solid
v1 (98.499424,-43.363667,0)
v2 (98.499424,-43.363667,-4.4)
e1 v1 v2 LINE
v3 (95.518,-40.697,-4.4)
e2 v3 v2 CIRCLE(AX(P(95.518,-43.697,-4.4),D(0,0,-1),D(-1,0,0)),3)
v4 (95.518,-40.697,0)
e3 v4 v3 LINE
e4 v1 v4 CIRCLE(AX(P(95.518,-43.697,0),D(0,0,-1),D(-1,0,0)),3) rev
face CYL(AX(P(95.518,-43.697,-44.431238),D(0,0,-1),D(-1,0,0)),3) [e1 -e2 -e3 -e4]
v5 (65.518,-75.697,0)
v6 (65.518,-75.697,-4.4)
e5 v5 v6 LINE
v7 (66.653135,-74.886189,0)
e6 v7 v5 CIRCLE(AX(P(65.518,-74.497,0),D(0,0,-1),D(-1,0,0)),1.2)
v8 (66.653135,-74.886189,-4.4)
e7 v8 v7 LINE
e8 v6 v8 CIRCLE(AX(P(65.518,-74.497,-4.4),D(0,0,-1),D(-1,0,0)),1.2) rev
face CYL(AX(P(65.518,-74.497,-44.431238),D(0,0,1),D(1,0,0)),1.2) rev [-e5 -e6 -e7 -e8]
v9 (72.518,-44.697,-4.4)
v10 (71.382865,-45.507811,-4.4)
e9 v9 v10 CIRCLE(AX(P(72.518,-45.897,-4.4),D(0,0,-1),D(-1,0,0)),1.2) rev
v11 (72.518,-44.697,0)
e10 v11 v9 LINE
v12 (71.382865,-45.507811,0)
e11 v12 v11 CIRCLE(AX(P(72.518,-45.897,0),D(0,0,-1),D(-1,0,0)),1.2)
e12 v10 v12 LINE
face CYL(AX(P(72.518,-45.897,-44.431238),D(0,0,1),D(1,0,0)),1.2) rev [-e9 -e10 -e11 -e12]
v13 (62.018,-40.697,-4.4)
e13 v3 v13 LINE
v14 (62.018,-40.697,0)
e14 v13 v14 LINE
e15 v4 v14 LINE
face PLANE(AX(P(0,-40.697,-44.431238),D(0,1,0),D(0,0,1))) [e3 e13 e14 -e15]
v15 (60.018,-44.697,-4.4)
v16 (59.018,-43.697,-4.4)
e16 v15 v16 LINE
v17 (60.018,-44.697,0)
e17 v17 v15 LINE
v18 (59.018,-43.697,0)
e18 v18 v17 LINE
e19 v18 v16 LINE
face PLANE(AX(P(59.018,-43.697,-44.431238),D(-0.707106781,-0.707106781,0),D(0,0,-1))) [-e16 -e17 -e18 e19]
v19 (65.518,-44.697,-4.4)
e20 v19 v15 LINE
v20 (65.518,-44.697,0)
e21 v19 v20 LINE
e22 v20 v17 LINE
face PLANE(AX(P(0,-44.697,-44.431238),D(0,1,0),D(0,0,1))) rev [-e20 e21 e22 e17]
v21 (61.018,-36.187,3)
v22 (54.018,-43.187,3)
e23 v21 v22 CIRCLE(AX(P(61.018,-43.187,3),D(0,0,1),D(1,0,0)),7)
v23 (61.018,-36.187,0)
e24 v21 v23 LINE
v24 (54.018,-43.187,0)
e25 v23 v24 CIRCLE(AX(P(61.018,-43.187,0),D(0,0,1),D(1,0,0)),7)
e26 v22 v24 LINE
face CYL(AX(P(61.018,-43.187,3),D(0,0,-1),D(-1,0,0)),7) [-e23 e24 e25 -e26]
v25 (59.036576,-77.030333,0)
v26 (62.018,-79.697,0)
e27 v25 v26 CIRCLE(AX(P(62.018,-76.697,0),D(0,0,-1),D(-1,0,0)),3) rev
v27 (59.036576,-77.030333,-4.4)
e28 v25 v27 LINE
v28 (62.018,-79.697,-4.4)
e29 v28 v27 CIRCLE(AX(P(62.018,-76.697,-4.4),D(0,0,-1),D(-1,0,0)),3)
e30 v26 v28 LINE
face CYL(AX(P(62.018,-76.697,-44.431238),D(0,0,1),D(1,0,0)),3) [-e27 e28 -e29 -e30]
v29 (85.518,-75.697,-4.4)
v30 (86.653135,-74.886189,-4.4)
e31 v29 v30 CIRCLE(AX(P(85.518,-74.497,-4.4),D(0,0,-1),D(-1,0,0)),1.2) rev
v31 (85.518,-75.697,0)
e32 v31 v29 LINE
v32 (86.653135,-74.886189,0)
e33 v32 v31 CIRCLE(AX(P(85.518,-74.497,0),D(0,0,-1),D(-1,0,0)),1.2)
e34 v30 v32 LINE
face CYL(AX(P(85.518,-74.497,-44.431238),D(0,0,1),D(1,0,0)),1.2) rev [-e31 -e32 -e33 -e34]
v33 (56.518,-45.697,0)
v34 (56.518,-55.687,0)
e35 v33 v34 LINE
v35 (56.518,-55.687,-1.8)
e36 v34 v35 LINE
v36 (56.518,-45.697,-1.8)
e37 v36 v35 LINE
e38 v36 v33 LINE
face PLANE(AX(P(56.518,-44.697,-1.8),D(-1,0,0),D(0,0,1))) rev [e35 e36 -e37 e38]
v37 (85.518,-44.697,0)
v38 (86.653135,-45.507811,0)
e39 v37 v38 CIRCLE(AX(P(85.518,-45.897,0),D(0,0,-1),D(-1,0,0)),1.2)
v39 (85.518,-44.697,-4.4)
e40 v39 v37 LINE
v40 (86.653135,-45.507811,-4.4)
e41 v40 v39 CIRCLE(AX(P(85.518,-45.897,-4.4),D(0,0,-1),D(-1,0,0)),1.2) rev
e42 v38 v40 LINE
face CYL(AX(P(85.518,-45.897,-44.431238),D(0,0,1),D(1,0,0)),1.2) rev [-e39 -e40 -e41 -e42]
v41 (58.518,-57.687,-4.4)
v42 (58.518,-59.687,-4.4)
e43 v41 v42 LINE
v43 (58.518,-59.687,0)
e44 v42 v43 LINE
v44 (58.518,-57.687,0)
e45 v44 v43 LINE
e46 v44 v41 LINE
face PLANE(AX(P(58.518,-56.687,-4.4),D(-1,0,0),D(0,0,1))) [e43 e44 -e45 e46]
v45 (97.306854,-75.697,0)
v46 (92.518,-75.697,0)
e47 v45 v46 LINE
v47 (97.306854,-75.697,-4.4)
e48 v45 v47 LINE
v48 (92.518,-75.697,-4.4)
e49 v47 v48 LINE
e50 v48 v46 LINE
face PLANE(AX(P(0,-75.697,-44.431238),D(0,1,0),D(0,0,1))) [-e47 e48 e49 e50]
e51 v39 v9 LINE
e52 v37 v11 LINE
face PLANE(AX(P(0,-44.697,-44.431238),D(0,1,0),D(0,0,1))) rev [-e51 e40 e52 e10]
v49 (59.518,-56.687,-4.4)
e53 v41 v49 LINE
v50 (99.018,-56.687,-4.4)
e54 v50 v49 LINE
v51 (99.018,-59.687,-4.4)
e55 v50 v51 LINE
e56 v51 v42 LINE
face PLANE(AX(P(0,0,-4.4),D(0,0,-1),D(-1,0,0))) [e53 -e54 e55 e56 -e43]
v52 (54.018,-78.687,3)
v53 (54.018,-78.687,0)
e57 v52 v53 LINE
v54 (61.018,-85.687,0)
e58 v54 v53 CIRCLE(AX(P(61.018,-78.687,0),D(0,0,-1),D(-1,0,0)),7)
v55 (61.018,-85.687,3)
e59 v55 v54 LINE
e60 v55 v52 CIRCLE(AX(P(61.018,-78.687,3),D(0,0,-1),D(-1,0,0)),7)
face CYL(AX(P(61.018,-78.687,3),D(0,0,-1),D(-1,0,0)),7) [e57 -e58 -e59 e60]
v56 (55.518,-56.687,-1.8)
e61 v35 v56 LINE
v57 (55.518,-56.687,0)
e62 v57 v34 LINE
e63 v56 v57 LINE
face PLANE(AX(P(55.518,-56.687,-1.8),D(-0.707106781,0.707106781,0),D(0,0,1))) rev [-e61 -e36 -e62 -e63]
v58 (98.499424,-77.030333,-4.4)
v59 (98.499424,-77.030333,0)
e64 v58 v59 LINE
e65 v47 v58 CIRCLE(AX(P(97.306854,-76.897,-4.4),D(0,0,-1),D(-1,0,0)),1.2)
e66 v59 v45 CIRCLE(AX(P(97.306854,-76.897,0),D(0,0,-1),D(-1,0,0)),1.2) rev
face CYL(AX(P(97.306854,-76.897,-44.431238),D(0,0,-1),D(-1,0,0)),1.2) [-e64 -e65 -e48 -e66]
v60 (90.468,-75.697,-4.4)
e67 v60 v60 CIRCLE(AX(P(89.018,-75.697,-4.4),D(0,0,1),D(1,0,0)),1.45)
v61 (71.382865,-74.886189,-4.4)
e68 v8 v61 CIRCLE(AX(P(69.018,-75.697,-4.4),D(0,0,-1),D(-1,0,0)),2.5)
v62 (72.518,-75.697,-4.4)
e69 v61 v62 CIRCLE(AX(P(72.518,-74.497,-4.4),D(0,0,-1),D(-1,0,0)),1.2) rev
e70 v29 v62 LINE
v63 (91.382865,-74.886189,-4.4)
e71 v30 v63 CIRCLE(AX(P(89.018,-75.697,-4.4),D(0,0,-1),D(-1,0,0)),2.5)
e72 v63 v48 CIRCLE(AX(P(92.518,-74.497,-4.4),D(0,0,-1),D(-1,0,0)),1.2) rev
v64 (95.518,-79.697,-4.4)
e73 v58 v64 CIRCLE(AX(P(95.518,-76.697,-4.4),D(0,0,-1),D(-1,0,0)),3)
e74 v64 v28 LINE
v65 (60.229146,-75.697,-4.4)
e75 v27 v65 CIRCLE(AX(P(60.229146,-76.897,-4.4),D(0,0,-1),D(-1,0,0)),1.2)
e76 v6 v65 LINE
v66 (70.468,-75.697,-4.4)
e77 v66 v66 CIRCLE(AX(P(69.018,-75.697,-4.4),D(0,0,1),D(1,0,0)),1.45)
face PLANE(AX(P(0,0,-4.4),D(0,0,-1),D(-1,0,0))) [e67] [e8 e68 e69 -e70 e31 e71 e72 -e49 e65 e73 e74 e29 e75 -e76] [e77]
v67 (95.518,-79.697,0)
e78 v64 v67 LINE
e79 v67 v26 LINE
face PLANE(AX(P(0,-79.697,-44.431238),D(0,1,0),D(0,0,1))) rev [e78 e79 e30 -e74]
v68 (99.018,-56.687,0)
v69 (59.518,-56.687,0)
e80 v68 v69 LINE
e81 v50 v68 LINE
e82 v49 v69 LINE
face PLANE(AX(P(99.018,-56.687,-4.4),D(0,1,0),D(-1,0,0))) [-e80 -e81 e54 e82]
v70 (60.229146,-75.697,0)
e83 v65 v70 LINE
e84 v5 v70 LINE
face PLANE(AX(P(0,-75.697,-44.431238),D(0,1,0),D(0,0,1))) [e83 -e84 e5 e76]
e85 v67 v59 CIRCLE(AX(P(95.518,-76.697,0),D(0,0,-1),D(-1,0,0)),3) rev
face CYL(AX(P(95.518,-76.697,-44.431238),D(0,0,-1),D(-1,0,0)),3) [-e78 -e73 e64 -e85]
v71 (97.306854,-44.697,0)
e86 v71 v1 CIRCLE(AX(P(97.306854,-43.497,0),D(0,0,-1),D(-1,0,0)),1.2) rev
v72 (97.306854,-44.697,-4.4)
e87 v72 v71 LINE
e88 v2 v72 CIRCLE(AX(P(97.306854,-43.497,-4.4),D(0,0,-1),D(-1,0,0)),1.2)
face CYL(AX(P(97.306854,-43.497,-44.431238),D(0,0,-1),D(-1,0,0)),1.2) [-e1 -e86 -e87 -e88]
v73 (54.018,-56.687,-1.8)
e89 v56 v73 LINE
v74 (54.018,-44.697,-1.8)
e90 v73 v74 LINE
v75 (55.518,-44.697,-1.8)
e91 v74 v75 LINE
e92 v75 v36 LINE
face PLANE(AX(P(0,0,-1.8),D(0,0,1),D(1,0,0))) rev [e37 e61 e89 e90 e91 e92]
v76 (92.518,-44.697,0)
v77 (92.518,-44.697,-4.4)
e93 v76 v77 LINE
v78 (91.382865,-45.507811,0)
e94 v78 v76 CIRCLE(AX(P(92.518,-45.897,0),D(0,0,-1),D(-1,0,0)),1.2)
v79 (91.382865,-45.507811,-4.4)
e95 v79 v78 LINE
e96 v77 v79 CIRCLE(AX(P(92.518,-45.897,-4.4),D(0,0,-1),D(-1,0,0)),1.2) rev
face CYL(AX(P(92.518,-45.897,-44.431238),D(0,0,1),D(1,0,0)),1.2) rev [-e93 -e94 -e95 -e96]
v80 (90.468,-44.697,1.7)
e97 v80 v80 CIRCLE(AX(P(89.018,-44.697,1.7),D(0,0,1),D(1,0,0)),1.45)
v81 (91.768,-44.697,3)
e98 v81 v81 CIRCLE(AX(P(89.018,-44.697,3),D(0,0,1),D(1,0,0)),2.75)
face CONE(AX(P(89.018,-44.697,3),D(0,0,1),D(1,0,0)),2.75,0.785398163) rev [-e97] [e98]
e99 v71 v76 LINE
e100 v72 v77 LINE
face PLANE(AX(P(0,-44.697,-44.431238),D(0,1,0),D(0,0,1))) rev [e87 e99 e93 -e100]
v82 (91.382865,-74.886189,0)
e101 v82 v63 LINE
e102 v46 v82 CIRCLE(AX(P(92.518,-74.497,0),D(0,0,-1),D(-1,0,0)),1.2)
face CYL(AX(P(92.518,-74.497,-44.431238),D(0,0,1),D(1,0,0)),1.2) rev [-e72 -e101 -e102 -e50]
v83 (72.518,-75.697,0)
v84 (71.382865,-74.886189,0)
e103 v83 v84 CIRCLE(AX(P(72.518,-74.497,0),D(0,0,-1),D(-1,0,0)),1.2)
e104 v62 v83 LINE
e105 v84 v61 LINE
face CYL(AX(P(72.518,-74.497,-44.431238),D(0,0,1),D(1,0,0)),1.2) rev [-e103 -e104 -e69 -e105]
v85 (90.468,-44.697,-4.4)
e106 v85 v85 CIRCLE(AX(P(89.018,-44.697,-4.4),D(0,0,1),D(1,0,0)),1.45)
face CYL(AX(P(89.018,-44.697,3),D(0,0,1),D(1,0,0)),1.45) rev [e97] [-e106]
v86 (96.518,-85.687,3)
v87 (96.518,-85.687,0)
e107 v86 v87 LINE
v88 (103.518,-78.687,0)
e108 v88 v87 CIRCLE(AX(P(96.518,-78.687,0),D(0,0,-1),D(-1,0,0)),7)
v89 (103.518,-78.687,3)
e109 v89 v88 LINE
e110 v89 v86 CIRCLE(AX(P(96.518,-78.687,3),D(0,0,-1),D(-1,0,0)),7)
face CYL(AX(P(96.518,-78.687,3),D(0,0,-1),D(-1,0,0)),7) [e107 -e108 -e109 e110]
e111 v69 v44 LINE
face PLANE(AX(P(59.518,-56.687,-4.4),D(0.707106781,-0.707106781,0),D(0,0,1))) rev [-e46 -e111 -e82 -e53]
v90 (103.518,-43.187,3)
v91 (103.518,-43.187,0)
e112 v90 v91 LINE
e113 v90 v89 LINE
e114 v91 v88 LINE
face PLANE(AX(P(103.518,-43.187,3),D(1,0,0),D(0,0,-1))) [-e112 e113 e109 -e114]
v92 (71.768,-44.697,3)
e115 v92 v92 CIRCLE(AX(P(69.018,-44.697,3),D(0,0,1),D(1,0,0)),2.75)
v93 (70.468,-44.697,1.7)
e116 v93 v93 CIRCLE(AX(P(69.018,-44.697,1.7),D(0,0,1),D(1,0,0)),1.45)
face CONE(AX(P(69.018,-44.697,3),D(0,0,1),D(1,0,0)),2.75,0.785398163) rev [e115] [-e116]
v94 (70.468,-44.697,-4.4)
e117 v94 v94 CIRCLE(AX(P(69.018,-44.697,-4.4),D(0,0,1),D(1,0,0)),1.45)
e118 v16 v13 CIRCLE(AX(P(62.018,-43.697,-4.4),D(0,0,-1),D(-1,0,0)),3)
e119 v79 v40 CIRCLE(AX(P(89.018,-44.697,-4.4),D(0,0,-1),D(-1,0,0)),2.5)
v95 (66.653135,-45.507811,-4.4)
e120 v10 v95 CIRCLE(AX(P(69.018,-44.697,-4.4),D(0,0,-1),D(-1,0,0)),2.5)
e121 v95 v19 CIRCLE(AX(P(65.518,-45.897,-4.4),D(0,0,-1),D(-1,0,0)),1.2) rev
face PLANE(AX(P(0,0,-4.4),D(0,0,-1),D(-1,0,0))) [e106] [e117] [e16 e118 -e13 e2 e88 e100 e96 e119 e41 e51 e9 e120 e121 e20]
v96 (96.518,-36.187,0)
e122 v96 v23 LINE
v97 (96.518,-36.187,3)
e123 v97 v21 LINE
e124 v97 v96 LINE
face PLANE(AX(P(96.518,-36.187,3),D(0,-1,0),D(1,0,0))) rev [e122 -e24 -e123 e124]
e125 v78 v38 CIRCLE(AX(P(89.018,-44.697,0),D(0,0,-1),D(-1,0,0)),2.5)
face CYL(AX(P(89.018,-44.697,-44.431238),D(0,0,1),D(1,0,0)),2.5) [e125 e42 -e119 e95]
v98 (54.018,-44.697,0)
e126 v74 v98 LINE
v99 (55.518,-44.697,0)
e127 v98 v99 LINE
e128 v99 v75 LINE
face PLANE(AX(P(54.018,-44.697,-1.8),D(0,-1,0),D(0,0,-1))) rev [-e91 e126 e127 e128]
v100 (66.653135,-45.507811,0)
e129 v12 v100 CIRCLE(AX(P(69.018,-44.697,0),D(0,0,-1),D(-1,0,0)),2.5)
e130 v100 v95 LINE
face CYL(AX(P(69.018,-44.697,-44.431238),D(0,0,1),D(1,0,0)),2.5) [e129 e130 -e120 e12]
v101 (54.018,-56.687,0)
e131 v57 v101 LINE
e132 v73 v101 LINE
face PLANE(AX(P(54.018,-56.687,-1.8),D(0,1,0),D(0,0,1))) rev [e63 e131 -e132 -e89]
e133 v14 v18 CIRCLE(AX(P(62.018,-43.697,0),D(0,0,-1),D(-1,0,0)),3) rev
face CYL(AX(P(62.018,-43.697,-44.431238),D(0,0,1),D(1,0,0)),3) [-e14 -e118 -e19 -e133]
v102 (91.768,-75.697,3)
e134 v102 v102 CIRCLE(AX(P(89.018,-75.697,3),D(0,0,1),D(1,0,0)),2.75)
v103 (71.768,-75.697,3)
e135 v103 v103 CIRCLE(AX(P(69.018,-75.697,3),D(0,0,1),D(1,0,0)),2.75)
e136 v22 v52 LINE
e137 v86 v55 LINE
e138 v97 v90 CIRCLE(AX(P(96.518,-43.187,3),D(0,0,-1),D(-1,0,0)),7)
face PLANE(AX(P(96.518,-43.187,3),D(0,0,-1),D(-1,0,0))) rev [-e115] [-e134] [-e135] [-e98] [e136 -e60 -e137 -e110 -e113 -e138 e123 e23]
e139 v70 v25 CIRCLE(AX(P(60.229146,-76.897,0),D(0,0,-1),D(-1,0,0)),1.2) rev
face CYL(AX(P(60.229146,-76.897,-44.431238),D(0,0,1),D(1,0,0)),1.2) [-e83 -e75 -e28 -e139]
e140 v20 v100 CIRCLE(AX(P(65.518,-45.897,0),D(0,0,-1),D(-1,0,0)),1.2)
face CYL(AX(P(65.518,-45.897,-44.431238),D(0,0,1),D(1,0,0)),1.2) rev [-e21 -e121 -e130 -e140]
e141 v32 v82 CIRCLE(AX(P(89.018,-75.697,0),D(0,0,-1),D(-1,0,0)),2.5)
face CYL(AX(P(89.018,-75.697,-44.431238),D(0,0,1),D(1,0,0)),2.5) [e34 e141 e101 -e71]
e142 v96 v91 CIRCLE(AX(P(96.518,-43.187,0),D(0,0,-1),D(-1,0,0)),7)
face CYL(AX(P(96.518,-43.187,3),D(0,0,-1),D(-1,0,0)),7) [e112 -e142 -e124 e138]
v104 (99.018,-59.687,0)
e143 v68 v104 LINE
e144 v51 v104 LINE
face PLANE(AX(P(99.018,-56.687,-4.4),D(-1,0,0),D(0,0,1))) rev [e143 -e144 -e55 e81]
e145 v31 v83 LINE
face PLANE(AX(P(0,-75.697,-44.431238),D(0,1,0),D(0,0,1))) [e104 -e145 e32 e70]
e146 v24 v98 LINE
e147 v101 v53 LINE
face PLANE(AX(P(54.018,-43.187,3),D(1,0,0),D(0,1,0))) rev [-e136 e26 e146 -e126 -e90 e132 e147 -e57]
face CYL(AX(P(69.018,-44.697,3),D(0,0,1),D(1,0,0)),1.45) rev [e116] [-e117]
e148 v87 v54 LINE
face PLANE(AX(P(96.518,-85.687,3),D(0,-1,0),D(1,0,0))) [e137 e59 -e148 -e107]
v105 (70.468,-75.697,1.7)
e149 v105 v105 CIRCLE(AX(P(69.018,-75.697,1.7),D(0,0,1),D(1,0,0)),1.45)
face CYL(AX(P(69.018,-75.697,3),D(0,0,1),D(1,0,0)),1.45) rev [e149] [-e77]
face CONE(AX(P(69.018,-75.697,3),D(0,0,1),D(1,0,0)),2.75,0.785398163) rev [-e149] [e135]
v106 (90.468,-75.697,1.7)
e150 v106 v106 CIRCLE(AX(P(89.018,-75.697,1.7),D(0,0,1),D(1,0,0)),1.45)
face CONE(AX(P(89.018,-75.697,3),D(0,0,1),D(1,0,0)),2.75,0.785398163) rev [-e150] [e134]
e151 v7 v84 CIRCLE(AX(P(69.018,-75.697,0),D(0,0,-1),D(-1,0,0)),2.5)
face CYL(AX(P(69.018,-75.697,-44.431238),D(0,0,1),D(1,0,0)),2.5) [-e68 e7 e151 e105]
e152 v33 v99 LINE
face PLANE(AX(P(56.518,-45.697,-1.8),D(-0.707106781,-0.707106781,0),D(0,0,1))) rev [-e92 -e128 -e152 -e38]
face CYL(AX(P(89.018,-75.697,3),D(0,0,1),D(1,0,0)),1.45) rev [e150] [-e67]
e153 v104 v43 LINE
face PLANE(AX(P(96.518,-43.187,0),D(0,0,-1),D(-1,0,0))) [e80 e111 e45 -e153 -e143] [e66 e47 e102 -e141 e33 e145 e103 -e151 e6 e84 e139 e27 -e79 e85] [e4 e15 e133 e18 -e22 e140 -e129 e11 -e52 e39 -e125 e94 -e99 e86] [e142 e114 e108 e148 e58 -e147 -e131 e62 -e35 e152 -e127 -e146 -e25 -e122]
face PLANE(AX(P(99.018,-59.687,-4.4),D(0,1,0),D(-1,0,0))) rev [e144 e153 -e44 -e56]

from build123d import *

# Parameters (mm, degrees)
EXTRUDE_1_DEPTH                = 3
SKETCH_3_W                     = 40.5
SKETCH_3_H                     = 3
EXTRUDE_3_DEPTH                = 4.4
EXTRUDE_6_DEPTH                = 4.4
SKETCH_2_W                     = 2.5
SKETCH_2_H                     = 11.99
EXTRUDE_2_DEPTH                = 1.8
FILLET_1_R                     = 3
FILLET_2_R                     = 1.2
HOLE_WIZARD_M2_5_1_D           = 2.9
HOLE_WIZARD_M2_5_1_CSINK_D     = 5.5
HOLE_WIZARD_M2_5_1_CSINK_ANGLE = 90
CHAMFER_3_SIZE                 = 1


# Some blends are built 0.0001 mm under size
with BuildPart() as part:
    # 草图1 → 凸台-拉伸1 (new body)
    with BuildSketch(Plane.XY):
        with BuildLine():
            Line((96.518, -36.187), (61.018, -36.187))
            ThreePointArc((61.018, -36.187), (56.068252532, -38.237252532), (54.018, -43.187))
            Line((54.018, -43.187), (54.018, -78.687))
            ThreePointArc((54.018, -78.687), (56.068252532, -83.636747468), (61.018, -85.687))
            Line((61.018, -85.687), (96.518, -85.687))
            ThreePointArc((96.518, -85.687), (101.467747468, -83.636747468), (103.518, -78.687))
            Line((103.518, -78.687), (103.518, -43.187))
            ThreePointArc((103.518, -43.187), (101.467747468, -38.237252532), (96.518, -36.187))
        make_face()
    extrude(amount=EXTRUDE_1_DEPTH)

    # 草图3 → 凸台-拉伸3 (add)
    with BuildSketch(Plane(origin=(0, 0, 0), x_dir=(-1, 0, 0), z_dir=(0, 0, -1))):
        with Locations((-78.768, -58.187)):
            Rectangle(SKETCH_3_W, SKETCH_3_H)
    extrude(amount=EXTRUDE_3_DEPTH)

    # 草图4 → 凸台-拉伸6 (add)
    with BuildSketch(Plane(origin=(0, 0, 0), x_dir=(-1, 0, 0), z_dir=(0, 0, -1))):
        with BuildLine():
            Line((-79.018, -44.697), (-79.018, -40.697))
            Line((-79.018, -40.697), (-98.518, -40.697))
            Line((-98.518, -40.697), (-98.518, -44.697))
            Line((-98.518, -44.697), (-91.518, -44.697))
            ThreePointArc((-91.518, -44.697), (-89.018, -42.197), (-86.518, -44.697))
            Line((-86.518, -44.697), (-79.018, -44.697))
        make_face()
        with BuildLine():
            Line((-59.018, -40.697), (-79.018, -40.697))
            Line((-79.018, -40.697), (-79.018, -44.697))
            Line((-79.018, -44.697), (-71.518, -44.697))
            ThreePointArc((-71.518, -44.697), (-69.018, -42.197), (-66.518, -44.697))
            Line((-66.518, -44.697), (-59.018, -44.697))
            Line((-59.018, -44.697), (-59.018, -40.697))
        make_face()
        with BuildLine():
            ThreePointArc((-89.018, -47.197), (-87.250233047, -46.464766953), (-86.518, -44.697))
            Line((-86.518, -44.697), (-87.718, -44.697))
            ThreePointArc((-87.718, -44.697), (-88.098761184, -45.616238816), (-89.018, -45.997))
            Line((-89.018, -45.997), (-89.018, -47.197))
        make_face()
        with BuildLine():
            Line((-90.318, -44.697), (-91.518, -44.697))
            ThreePointArc((-91.518, -44.697), (-90.785766953, -46.464766953), (-89.018, -47.197))
            Line((-89.018, -47.197), (-89.018, -45.997))
            ThreePointArc((-89.018, -45.997), (-89.937238816, -45.616238816), (-90.318, -44.697))
        make_face()
        with BuildLine():
            Line((-87.718, -44.697), (-86.518, -44.697))
            ThreePointArc((-86.518, -44.697), (-89.018, -42.197), (-91.518, -44.697))
            Line((-91.518, -44.697), (-90.318, -44.697))
            ThreePointArc((-90.318, -44.697), (-89.018, -43.397), (-87.718, -44.697))
        make_face()
        with BuildLine():
            ThreePointArc((-66.518, -44.697), (-69.018, -42.197), (-71.518, -44.697))
            Line((-71.518, -44.697), (-70.318, -44.697))
            ThreePointArc((-70.318, -44.697), (-69.018, -43.397), (-67.718, -44.697))
            Line((-67.718, -44.697), (-66.518, -44.697))
        make_face()
        with BuildLine():
            Line((-70.318, -44.697), (-71.518, -44.697))
            ThreePointArc((-71.518, -44.697), (-70.785766953, -46.464766953), (-69.018, -47.197))
            Line((-69.018, -47.197), (-69.018, -45.997))
            ThreePointArc((-69.018, -45.997), (-69.937238816, -45.616238816), (-70.318, -44.697))
        make_face()
        with BuildLine():
            ThreePointArc((-69.018, -47.197), (-67.250233047, -46.464766953), (-66.518, -44.697))
            Line((-66.518, -44.697), (-67.718, -44.697))
            ThreePointArc((-67.718, -44.697), (-68.098761184, -45.616238816), (-69.018, -45.997))
            Line((-69.018, -45.997), (-69.018, -47.197))
        make_face()
        with BuildLine():
            ThreePointArc((-69.018, -73.197), (-70.785766953, -73.929233047), (-71.518, -75.697))
            Line((-71.518, -75.697), (-70.318, -75.697))
            ThreePointArc((-70.318, -75.697), (-69.937238816, -74.777761184), (-69.018, -74.397))
            Line((-69.018, -74.397), (-69.018, -73.197))
        make_face()
        with BuildLine():
            ThreePointArc((-66.518, -75.697), (-67.250233047, -73.929233047), (-69.018, -73.197))
            Line((-69.018, -73.197), (-69.018, -74.397))
            ThreePointArc((-69.018, -74.397), (-68.098761184, -74.777761184), (-67.718, -75.697))
            Line((-67.718, -75.697), (-66.518, -75.697))
        make_face()
        with BuildLine():
            Line((-70.318, -75.697), (-71.518, -75.697))
            ThreePointArc((-71.518, -75.697), (-69.018, -78.197), (-66.518, -75.697))
            Line((-66.518, -75.697), (-67.718, -75.697))
            ThreePointArc((-67.718, -75.697), (-69.018, -76.997), (-70.318, -75.697))
        make_face()
        with BuildLine():
            Line((-71.518, -75.697), (-79.018, -75.697))
            Line((-79.018, -75.697), (-79.018, -79.697))
            Line((-79.018, -79.697), (-59.018, -79.697))
            Line((-59.018, -79.697), (-59.018, -75.697))
            Line((-59.018, -75.697), (-66.518, -75.697))
            ThreePointArc((-66.518, -75.697), (-69.018, -78.197), (-71.518, -75.697))
        make_face()
        with BuildLine():
            Line((-79.018, -79.697), (-79.018, -75.697))
            Line((-79.018, -75.697), (-86.518, -75.697))
            ThreePointArc((-86.518, -75.697), (-89.018, -78.197), (-91.518, -75.697))
            Line((-91.518, -75.697), (-98.518, -75.697))
            Line((-98.518, -75.697), (-98.518, -79.697))
            Line((-98.518, -79.697), (-79.018, -79.697))
        make_face()
        with BuildLine():
            ThreePointArc((-91.518, -75.697), (-89.018, -78.197), (-86.518, -75.697))
            Line((-86.518, -75.697), (-87.718, -75.697))
            ThreePointArc((-87.718, -75.697), (-89.018, -76.997), (-90.318, -75.697))
            Line((-90.318, -75.697), (-91.518, -75.697))
        make_face()
        with BuildLine():
            Line((-87.718, -75.697), (-86.518, -75.697))
            ThreePointArc((-86.518, -75.697), (-87.250233047, -73.929233047), (-89.018, -73.197))
            Line((-89.018, -73.197), (-89.018, -74.397))
            ThreePointArc((-89.018, -74.397), (-88.098761184, -74.777761184), (-87.718, -75.697))
        make_face()
        with BuildLine():
            Line((-89.018, -74.397), (-89.018, -73.197))
            ThreePointArc((-89.018, -73.197), (-90.785766953, -73.929233047), (-91.518, -75.697))
            Line((-91.518, -75.697), (-90.318, -75.697))
            ThreePointArc((-90.318, -75.697), (-89.937238816, -74.777761184), (-89.018, -74.397))
        make_face()
    extrude(amount=EXTRUDE_6_DEPTH)

    # 草图2 → 凸台-拉伸2 (add)
    with BuildSketch(Plane(origin=(0, 0, 0), x_dir=(-1, 0, 0), z_dir=(0, 0, -1))):
        with Locations((-55.268, -50.692)):
            Rectangle(SKETCH_2_W, SKETCH_2_H)
    extrude(amount=EXTRUDE_2_DEPTH)

    # 圆角1
    fillet_1_edges = [part.edges().sort_by_distance(p)[0] for p in [
        (59.018, -40.697, -2.2),
        (98.518, -40.697, -2.2),
        (59.018, -79.697, -2.2),
        (98.518, -79.697, -2.2),
    ]]
    fillet(fillet_1_edges, radius=FILLET_1_R)

    # 圆角2
    # the kernel refuses this fillet: 1.2 mm, written as the material it adds along each edge
    with BuildSketch(Plane(origin=(91.518, -44.697, 2.5), x_dir=(-0.16439898730516103, -0.9863939238321764, 0), z_dir=(0, 0, -1)), Plane(origin=(71.518, -44.697, 2.5), x_dir=(-0.16439898730516103, -0.9863939238321764, 0), z_dir=(0, 0, -1))) as fillet_2_piece_1:
        with BuildLine():
            CenterArc((1.019273721, -1.183672709), FILLET_2_R, 99.462322208, 71.075355584)
            Line((-0.164398987, -0.986393924), (0, 0))
            ThreePointArc((0, 0), (0.410997468, -0.03401519), (0.821994937, 0))
        make_face()
    extrude(amount=6.9)
    with BuildSketch(Plane(origin=(86.518, -44.697, 2.5), x_dir=(-1, 0, 0), z_dir=(0, 0, -1)), Plane(origin=(66.518, -44.697, 2.5), x_dir=(-1, 0, 0), z_dir=(0, 0, -1))) as fillet_2_piece_2:
        with BuildLine():
            CenterArc((1, -1.2), FILLET_2_R, 90, 71.075355584)
            ThreePointArc((-0.135135135, -0.810810811), (-0.03401519, -0.410997468), (0, 0))
            Line((0, 0), (1, 0))
        make_face()
    extrude(amount=6.9)
    with BuildSketch(Plane(origin=(71.518, -75.697, 2.5), x_dir=(-0.16439898730513022, 0.9863939238321816, 0), z_dir=(0, 0, -1)), Plane(origin=(91.518, -75.697, 2.5), x_dir=(-0.16439898730515545, 0.9863939238321774, 0), z_dir=(0, 0, -1))) as fillet_2_piece_3:
        with BuildLine():
            CenterArc((1.019273721, 1.183672709), FILLET_2_R, 189.462322208, 71.075355584)
            Line((-0.164398987, 0.986393924), (0, 0))
            ThreePointArc((0, 0), (0.410997468, 0.03401519), (0.821994937, 0))
        make_face()
    extrude(amount=6.9)
    with BuildSketch(Plane(origin=(66.518, -75.697, 2.5), x_dir=(-1, 0, 0), z_dir=(0, 0, -1)), Plane(origin=(86.518, -75.697, 2.5), x_dir=(-1, 0, 0), z_dir=(0, 0, -1))) as fillet_2_piece_4:
        with BuildLine():
            CenterArc((1, 1.2), FILLET_2_R, 198.924644416, 71.075355584)
            ThreePointArc((-0.135135135, 0.810810811), (-0.03401519, 0.410997468), (0, 0))
            Line((0, 0), (1, 0))
        make_face()
    extrude(amount=6.9)
    # the kernel refuses this fillet: 1.2 mm, written as the material it takes off along each edge
    with BuildSketch(Plane(origin=(59.018, -76.697, -4.4), x_dir=(0, 0, 1), z_dir=(0, 1, 0))) as fillet_2_2_piece_1_section:
        with BuildLine():
            CenterArc((FILLET_2_R, FILLET_2_R), FILLET_2_R, 180, 90)
            Line((0, FILLET_2_R), (0, 0))
            Line((0, 0), (FILLET_2_R, 0))
        make_face()
    fillet_2_2_piece_1 = extrude(amount=4, mode=Mode.PRIVATE)
    fillet_2_2_piece_1 = fillet_2_2_piece_1 - Plane(origin=(62.018, -76.697, -3.946727239), x_dir=(-1, 0, 0), z_dir=(0, 0, -1)) * Cylinder(3, 13, mode=Mode.PRIVATE)
    add(fillet_2_2_piece_1, mode=Mode.SUBTRACT)
    with BuildSketch(Plane(origin=(98.518, -72.697, -4.4), x_dir=(0, 0, 1), z_dir=(0, -1, 0))) as fillet_2_2_piece_2_section:
        with BuildLine():
            CenterArc((FILLET_2_R, FILLET_2_R), FILLET_2_R, 180, 90)
            Line((0, FILLET_2_R), (0, 0))
            Line((0, 0), (FILLET_2_R, 0))
        make_face()
    fillet_2_2_piece_2 = extrude(amount=4, mode=Mode.PRIVATE)
    fillet_2_2_piece_2 = fillet_2_2_piece_2 - Plane(origin=(95.518, -76.697, -3.946727241), x_dir=(0, -1, 0), z_dir=(0, 0, -1)) * Cylinder(3, 13, mode=Mode.PRIVATE)
    add(fillet_2_2_piece_2, mode=Mode.SUBTRACT)
    with BuildSketch(Plane(origin=(98.518, -43.697, -4.4), x_dir=(0, 0, 1), z_dir=(0, -1, 0))) as fillet_2_2_piece_3_section:
        with BuildLine():
            CenterArc((FILLET_2_R, FILLET_2_R), FILLET_2_R, 180, 90)
            Line((0, FILLET_2_R), (0, 0))
            Line((0, 0), (FILLET_2_R, 0))
        make_face()
    fillet_2_2_piece_3 = extrude(amount=4, mode=Mode.PRIVATE)
    fillet_2_2_piece_3 = fillet_2_2_piece_3 - Plane(origin=(95.518, -43.697, -3.946727241), x_dir=(0, 1, 0), z_dir=(0, 0, -1)) * Cylinder(3, 13, mode=Mode.PRIVATE)
    add(fillet_2_2_piece_3, mode=Mode.SUBTRACT)
    with BuildSketch(Plane(origin=(98.518, -44.697, 0), x_dir=(-1, 0, 0), z_dir=(0, 0, -1)), Plane(origin=(59.018, -75.697, 0), x_dir=(1, 0, 0), z_dir=(0, 0, -1))) as fillet_2_2_piece_4:
        with BuildLine():
            CenterArc((1.211145618, 1.2), FILLET_2_R, 173.620629792, 96.379370208)
            Line((0.01857603, 1.333333333), (-0.100680929, 1.346666667))
            ThreePointArc((-0.100680929, 1.346666667), (-0.12, 1), (-0.12, 0))
            Line((-0.12, 0), (0, -0.12))
            Line((0, -0.12), (1.211145618, -0.12))
            Line((1.211145618, -0.12), (1.211145618, 0))
        make_face()
    extrude(amount=7.73365682, mode=Mode.SUBTRACT)
    with BuildSketch(Plane(origin=(98.518, -75.697, 0), x_dir=(-0.013930670585512008, -0.9999029635004779, 0), z_dir=(0, 0, -1))) as fillet_2_2_piece_5:
        with BuildLine():
            CenterArc((1.216755627, 1.194311288), FILLET_2_R, 179.201805551, 96.379370208)
            Line((0.016872071, 1.211028093), (-0.103116285, 1.212699773))
            Line((-0.103116285, 1.212699773), (-0.119988356, 0.00167168))
            Line((-0.119988356, 0.00167168), (-0.00167168, -0.119988356))
            ThreePointArc((-0.00167168, -0.119988356), (0.998231283, -0.133919026), (1.345133438, -0.119431129))
            Line((1.345133438, -0.119431129), (1.333462728, 0))
        make_face()
    extrude(amount=7.73365682, mode=Mode.SUBTRACT)

    # M2.5 平头机械螺钉的锥形沉头孔1 (through all)
    with Locations(Plane.XY.offset(3)):
        with Locations((69.018, -44.697), (69.018, -75.697), (89.018, -75.697), (89.018, -44.697)):
            CounterSinkHole(HOLE_WIZARD_M2_5_1_D / 2, HOLE_WIZARD_M2_5_1_CSINK_D / 2, counter_sink_angle=HOLE_WIZARD_M2_5_1_CSINK_ANGLE)

    # 倒角3
    chamfer_3_edges = [part.edges().sort_by_distance(p)[0] for p in [
        (59.018, -44.697, -2.2),
        (56.518, -44.697, -0.9),
        (56.518, -56.687, -0.9),
        (58.518, -56.687, -2.2),
    ]]
    chamfer(chamfer_3_edges, length=CHAMFER_3_SIZE - 0.0001)  # a hair under: the kernel refuses the full size


solid = part.part
